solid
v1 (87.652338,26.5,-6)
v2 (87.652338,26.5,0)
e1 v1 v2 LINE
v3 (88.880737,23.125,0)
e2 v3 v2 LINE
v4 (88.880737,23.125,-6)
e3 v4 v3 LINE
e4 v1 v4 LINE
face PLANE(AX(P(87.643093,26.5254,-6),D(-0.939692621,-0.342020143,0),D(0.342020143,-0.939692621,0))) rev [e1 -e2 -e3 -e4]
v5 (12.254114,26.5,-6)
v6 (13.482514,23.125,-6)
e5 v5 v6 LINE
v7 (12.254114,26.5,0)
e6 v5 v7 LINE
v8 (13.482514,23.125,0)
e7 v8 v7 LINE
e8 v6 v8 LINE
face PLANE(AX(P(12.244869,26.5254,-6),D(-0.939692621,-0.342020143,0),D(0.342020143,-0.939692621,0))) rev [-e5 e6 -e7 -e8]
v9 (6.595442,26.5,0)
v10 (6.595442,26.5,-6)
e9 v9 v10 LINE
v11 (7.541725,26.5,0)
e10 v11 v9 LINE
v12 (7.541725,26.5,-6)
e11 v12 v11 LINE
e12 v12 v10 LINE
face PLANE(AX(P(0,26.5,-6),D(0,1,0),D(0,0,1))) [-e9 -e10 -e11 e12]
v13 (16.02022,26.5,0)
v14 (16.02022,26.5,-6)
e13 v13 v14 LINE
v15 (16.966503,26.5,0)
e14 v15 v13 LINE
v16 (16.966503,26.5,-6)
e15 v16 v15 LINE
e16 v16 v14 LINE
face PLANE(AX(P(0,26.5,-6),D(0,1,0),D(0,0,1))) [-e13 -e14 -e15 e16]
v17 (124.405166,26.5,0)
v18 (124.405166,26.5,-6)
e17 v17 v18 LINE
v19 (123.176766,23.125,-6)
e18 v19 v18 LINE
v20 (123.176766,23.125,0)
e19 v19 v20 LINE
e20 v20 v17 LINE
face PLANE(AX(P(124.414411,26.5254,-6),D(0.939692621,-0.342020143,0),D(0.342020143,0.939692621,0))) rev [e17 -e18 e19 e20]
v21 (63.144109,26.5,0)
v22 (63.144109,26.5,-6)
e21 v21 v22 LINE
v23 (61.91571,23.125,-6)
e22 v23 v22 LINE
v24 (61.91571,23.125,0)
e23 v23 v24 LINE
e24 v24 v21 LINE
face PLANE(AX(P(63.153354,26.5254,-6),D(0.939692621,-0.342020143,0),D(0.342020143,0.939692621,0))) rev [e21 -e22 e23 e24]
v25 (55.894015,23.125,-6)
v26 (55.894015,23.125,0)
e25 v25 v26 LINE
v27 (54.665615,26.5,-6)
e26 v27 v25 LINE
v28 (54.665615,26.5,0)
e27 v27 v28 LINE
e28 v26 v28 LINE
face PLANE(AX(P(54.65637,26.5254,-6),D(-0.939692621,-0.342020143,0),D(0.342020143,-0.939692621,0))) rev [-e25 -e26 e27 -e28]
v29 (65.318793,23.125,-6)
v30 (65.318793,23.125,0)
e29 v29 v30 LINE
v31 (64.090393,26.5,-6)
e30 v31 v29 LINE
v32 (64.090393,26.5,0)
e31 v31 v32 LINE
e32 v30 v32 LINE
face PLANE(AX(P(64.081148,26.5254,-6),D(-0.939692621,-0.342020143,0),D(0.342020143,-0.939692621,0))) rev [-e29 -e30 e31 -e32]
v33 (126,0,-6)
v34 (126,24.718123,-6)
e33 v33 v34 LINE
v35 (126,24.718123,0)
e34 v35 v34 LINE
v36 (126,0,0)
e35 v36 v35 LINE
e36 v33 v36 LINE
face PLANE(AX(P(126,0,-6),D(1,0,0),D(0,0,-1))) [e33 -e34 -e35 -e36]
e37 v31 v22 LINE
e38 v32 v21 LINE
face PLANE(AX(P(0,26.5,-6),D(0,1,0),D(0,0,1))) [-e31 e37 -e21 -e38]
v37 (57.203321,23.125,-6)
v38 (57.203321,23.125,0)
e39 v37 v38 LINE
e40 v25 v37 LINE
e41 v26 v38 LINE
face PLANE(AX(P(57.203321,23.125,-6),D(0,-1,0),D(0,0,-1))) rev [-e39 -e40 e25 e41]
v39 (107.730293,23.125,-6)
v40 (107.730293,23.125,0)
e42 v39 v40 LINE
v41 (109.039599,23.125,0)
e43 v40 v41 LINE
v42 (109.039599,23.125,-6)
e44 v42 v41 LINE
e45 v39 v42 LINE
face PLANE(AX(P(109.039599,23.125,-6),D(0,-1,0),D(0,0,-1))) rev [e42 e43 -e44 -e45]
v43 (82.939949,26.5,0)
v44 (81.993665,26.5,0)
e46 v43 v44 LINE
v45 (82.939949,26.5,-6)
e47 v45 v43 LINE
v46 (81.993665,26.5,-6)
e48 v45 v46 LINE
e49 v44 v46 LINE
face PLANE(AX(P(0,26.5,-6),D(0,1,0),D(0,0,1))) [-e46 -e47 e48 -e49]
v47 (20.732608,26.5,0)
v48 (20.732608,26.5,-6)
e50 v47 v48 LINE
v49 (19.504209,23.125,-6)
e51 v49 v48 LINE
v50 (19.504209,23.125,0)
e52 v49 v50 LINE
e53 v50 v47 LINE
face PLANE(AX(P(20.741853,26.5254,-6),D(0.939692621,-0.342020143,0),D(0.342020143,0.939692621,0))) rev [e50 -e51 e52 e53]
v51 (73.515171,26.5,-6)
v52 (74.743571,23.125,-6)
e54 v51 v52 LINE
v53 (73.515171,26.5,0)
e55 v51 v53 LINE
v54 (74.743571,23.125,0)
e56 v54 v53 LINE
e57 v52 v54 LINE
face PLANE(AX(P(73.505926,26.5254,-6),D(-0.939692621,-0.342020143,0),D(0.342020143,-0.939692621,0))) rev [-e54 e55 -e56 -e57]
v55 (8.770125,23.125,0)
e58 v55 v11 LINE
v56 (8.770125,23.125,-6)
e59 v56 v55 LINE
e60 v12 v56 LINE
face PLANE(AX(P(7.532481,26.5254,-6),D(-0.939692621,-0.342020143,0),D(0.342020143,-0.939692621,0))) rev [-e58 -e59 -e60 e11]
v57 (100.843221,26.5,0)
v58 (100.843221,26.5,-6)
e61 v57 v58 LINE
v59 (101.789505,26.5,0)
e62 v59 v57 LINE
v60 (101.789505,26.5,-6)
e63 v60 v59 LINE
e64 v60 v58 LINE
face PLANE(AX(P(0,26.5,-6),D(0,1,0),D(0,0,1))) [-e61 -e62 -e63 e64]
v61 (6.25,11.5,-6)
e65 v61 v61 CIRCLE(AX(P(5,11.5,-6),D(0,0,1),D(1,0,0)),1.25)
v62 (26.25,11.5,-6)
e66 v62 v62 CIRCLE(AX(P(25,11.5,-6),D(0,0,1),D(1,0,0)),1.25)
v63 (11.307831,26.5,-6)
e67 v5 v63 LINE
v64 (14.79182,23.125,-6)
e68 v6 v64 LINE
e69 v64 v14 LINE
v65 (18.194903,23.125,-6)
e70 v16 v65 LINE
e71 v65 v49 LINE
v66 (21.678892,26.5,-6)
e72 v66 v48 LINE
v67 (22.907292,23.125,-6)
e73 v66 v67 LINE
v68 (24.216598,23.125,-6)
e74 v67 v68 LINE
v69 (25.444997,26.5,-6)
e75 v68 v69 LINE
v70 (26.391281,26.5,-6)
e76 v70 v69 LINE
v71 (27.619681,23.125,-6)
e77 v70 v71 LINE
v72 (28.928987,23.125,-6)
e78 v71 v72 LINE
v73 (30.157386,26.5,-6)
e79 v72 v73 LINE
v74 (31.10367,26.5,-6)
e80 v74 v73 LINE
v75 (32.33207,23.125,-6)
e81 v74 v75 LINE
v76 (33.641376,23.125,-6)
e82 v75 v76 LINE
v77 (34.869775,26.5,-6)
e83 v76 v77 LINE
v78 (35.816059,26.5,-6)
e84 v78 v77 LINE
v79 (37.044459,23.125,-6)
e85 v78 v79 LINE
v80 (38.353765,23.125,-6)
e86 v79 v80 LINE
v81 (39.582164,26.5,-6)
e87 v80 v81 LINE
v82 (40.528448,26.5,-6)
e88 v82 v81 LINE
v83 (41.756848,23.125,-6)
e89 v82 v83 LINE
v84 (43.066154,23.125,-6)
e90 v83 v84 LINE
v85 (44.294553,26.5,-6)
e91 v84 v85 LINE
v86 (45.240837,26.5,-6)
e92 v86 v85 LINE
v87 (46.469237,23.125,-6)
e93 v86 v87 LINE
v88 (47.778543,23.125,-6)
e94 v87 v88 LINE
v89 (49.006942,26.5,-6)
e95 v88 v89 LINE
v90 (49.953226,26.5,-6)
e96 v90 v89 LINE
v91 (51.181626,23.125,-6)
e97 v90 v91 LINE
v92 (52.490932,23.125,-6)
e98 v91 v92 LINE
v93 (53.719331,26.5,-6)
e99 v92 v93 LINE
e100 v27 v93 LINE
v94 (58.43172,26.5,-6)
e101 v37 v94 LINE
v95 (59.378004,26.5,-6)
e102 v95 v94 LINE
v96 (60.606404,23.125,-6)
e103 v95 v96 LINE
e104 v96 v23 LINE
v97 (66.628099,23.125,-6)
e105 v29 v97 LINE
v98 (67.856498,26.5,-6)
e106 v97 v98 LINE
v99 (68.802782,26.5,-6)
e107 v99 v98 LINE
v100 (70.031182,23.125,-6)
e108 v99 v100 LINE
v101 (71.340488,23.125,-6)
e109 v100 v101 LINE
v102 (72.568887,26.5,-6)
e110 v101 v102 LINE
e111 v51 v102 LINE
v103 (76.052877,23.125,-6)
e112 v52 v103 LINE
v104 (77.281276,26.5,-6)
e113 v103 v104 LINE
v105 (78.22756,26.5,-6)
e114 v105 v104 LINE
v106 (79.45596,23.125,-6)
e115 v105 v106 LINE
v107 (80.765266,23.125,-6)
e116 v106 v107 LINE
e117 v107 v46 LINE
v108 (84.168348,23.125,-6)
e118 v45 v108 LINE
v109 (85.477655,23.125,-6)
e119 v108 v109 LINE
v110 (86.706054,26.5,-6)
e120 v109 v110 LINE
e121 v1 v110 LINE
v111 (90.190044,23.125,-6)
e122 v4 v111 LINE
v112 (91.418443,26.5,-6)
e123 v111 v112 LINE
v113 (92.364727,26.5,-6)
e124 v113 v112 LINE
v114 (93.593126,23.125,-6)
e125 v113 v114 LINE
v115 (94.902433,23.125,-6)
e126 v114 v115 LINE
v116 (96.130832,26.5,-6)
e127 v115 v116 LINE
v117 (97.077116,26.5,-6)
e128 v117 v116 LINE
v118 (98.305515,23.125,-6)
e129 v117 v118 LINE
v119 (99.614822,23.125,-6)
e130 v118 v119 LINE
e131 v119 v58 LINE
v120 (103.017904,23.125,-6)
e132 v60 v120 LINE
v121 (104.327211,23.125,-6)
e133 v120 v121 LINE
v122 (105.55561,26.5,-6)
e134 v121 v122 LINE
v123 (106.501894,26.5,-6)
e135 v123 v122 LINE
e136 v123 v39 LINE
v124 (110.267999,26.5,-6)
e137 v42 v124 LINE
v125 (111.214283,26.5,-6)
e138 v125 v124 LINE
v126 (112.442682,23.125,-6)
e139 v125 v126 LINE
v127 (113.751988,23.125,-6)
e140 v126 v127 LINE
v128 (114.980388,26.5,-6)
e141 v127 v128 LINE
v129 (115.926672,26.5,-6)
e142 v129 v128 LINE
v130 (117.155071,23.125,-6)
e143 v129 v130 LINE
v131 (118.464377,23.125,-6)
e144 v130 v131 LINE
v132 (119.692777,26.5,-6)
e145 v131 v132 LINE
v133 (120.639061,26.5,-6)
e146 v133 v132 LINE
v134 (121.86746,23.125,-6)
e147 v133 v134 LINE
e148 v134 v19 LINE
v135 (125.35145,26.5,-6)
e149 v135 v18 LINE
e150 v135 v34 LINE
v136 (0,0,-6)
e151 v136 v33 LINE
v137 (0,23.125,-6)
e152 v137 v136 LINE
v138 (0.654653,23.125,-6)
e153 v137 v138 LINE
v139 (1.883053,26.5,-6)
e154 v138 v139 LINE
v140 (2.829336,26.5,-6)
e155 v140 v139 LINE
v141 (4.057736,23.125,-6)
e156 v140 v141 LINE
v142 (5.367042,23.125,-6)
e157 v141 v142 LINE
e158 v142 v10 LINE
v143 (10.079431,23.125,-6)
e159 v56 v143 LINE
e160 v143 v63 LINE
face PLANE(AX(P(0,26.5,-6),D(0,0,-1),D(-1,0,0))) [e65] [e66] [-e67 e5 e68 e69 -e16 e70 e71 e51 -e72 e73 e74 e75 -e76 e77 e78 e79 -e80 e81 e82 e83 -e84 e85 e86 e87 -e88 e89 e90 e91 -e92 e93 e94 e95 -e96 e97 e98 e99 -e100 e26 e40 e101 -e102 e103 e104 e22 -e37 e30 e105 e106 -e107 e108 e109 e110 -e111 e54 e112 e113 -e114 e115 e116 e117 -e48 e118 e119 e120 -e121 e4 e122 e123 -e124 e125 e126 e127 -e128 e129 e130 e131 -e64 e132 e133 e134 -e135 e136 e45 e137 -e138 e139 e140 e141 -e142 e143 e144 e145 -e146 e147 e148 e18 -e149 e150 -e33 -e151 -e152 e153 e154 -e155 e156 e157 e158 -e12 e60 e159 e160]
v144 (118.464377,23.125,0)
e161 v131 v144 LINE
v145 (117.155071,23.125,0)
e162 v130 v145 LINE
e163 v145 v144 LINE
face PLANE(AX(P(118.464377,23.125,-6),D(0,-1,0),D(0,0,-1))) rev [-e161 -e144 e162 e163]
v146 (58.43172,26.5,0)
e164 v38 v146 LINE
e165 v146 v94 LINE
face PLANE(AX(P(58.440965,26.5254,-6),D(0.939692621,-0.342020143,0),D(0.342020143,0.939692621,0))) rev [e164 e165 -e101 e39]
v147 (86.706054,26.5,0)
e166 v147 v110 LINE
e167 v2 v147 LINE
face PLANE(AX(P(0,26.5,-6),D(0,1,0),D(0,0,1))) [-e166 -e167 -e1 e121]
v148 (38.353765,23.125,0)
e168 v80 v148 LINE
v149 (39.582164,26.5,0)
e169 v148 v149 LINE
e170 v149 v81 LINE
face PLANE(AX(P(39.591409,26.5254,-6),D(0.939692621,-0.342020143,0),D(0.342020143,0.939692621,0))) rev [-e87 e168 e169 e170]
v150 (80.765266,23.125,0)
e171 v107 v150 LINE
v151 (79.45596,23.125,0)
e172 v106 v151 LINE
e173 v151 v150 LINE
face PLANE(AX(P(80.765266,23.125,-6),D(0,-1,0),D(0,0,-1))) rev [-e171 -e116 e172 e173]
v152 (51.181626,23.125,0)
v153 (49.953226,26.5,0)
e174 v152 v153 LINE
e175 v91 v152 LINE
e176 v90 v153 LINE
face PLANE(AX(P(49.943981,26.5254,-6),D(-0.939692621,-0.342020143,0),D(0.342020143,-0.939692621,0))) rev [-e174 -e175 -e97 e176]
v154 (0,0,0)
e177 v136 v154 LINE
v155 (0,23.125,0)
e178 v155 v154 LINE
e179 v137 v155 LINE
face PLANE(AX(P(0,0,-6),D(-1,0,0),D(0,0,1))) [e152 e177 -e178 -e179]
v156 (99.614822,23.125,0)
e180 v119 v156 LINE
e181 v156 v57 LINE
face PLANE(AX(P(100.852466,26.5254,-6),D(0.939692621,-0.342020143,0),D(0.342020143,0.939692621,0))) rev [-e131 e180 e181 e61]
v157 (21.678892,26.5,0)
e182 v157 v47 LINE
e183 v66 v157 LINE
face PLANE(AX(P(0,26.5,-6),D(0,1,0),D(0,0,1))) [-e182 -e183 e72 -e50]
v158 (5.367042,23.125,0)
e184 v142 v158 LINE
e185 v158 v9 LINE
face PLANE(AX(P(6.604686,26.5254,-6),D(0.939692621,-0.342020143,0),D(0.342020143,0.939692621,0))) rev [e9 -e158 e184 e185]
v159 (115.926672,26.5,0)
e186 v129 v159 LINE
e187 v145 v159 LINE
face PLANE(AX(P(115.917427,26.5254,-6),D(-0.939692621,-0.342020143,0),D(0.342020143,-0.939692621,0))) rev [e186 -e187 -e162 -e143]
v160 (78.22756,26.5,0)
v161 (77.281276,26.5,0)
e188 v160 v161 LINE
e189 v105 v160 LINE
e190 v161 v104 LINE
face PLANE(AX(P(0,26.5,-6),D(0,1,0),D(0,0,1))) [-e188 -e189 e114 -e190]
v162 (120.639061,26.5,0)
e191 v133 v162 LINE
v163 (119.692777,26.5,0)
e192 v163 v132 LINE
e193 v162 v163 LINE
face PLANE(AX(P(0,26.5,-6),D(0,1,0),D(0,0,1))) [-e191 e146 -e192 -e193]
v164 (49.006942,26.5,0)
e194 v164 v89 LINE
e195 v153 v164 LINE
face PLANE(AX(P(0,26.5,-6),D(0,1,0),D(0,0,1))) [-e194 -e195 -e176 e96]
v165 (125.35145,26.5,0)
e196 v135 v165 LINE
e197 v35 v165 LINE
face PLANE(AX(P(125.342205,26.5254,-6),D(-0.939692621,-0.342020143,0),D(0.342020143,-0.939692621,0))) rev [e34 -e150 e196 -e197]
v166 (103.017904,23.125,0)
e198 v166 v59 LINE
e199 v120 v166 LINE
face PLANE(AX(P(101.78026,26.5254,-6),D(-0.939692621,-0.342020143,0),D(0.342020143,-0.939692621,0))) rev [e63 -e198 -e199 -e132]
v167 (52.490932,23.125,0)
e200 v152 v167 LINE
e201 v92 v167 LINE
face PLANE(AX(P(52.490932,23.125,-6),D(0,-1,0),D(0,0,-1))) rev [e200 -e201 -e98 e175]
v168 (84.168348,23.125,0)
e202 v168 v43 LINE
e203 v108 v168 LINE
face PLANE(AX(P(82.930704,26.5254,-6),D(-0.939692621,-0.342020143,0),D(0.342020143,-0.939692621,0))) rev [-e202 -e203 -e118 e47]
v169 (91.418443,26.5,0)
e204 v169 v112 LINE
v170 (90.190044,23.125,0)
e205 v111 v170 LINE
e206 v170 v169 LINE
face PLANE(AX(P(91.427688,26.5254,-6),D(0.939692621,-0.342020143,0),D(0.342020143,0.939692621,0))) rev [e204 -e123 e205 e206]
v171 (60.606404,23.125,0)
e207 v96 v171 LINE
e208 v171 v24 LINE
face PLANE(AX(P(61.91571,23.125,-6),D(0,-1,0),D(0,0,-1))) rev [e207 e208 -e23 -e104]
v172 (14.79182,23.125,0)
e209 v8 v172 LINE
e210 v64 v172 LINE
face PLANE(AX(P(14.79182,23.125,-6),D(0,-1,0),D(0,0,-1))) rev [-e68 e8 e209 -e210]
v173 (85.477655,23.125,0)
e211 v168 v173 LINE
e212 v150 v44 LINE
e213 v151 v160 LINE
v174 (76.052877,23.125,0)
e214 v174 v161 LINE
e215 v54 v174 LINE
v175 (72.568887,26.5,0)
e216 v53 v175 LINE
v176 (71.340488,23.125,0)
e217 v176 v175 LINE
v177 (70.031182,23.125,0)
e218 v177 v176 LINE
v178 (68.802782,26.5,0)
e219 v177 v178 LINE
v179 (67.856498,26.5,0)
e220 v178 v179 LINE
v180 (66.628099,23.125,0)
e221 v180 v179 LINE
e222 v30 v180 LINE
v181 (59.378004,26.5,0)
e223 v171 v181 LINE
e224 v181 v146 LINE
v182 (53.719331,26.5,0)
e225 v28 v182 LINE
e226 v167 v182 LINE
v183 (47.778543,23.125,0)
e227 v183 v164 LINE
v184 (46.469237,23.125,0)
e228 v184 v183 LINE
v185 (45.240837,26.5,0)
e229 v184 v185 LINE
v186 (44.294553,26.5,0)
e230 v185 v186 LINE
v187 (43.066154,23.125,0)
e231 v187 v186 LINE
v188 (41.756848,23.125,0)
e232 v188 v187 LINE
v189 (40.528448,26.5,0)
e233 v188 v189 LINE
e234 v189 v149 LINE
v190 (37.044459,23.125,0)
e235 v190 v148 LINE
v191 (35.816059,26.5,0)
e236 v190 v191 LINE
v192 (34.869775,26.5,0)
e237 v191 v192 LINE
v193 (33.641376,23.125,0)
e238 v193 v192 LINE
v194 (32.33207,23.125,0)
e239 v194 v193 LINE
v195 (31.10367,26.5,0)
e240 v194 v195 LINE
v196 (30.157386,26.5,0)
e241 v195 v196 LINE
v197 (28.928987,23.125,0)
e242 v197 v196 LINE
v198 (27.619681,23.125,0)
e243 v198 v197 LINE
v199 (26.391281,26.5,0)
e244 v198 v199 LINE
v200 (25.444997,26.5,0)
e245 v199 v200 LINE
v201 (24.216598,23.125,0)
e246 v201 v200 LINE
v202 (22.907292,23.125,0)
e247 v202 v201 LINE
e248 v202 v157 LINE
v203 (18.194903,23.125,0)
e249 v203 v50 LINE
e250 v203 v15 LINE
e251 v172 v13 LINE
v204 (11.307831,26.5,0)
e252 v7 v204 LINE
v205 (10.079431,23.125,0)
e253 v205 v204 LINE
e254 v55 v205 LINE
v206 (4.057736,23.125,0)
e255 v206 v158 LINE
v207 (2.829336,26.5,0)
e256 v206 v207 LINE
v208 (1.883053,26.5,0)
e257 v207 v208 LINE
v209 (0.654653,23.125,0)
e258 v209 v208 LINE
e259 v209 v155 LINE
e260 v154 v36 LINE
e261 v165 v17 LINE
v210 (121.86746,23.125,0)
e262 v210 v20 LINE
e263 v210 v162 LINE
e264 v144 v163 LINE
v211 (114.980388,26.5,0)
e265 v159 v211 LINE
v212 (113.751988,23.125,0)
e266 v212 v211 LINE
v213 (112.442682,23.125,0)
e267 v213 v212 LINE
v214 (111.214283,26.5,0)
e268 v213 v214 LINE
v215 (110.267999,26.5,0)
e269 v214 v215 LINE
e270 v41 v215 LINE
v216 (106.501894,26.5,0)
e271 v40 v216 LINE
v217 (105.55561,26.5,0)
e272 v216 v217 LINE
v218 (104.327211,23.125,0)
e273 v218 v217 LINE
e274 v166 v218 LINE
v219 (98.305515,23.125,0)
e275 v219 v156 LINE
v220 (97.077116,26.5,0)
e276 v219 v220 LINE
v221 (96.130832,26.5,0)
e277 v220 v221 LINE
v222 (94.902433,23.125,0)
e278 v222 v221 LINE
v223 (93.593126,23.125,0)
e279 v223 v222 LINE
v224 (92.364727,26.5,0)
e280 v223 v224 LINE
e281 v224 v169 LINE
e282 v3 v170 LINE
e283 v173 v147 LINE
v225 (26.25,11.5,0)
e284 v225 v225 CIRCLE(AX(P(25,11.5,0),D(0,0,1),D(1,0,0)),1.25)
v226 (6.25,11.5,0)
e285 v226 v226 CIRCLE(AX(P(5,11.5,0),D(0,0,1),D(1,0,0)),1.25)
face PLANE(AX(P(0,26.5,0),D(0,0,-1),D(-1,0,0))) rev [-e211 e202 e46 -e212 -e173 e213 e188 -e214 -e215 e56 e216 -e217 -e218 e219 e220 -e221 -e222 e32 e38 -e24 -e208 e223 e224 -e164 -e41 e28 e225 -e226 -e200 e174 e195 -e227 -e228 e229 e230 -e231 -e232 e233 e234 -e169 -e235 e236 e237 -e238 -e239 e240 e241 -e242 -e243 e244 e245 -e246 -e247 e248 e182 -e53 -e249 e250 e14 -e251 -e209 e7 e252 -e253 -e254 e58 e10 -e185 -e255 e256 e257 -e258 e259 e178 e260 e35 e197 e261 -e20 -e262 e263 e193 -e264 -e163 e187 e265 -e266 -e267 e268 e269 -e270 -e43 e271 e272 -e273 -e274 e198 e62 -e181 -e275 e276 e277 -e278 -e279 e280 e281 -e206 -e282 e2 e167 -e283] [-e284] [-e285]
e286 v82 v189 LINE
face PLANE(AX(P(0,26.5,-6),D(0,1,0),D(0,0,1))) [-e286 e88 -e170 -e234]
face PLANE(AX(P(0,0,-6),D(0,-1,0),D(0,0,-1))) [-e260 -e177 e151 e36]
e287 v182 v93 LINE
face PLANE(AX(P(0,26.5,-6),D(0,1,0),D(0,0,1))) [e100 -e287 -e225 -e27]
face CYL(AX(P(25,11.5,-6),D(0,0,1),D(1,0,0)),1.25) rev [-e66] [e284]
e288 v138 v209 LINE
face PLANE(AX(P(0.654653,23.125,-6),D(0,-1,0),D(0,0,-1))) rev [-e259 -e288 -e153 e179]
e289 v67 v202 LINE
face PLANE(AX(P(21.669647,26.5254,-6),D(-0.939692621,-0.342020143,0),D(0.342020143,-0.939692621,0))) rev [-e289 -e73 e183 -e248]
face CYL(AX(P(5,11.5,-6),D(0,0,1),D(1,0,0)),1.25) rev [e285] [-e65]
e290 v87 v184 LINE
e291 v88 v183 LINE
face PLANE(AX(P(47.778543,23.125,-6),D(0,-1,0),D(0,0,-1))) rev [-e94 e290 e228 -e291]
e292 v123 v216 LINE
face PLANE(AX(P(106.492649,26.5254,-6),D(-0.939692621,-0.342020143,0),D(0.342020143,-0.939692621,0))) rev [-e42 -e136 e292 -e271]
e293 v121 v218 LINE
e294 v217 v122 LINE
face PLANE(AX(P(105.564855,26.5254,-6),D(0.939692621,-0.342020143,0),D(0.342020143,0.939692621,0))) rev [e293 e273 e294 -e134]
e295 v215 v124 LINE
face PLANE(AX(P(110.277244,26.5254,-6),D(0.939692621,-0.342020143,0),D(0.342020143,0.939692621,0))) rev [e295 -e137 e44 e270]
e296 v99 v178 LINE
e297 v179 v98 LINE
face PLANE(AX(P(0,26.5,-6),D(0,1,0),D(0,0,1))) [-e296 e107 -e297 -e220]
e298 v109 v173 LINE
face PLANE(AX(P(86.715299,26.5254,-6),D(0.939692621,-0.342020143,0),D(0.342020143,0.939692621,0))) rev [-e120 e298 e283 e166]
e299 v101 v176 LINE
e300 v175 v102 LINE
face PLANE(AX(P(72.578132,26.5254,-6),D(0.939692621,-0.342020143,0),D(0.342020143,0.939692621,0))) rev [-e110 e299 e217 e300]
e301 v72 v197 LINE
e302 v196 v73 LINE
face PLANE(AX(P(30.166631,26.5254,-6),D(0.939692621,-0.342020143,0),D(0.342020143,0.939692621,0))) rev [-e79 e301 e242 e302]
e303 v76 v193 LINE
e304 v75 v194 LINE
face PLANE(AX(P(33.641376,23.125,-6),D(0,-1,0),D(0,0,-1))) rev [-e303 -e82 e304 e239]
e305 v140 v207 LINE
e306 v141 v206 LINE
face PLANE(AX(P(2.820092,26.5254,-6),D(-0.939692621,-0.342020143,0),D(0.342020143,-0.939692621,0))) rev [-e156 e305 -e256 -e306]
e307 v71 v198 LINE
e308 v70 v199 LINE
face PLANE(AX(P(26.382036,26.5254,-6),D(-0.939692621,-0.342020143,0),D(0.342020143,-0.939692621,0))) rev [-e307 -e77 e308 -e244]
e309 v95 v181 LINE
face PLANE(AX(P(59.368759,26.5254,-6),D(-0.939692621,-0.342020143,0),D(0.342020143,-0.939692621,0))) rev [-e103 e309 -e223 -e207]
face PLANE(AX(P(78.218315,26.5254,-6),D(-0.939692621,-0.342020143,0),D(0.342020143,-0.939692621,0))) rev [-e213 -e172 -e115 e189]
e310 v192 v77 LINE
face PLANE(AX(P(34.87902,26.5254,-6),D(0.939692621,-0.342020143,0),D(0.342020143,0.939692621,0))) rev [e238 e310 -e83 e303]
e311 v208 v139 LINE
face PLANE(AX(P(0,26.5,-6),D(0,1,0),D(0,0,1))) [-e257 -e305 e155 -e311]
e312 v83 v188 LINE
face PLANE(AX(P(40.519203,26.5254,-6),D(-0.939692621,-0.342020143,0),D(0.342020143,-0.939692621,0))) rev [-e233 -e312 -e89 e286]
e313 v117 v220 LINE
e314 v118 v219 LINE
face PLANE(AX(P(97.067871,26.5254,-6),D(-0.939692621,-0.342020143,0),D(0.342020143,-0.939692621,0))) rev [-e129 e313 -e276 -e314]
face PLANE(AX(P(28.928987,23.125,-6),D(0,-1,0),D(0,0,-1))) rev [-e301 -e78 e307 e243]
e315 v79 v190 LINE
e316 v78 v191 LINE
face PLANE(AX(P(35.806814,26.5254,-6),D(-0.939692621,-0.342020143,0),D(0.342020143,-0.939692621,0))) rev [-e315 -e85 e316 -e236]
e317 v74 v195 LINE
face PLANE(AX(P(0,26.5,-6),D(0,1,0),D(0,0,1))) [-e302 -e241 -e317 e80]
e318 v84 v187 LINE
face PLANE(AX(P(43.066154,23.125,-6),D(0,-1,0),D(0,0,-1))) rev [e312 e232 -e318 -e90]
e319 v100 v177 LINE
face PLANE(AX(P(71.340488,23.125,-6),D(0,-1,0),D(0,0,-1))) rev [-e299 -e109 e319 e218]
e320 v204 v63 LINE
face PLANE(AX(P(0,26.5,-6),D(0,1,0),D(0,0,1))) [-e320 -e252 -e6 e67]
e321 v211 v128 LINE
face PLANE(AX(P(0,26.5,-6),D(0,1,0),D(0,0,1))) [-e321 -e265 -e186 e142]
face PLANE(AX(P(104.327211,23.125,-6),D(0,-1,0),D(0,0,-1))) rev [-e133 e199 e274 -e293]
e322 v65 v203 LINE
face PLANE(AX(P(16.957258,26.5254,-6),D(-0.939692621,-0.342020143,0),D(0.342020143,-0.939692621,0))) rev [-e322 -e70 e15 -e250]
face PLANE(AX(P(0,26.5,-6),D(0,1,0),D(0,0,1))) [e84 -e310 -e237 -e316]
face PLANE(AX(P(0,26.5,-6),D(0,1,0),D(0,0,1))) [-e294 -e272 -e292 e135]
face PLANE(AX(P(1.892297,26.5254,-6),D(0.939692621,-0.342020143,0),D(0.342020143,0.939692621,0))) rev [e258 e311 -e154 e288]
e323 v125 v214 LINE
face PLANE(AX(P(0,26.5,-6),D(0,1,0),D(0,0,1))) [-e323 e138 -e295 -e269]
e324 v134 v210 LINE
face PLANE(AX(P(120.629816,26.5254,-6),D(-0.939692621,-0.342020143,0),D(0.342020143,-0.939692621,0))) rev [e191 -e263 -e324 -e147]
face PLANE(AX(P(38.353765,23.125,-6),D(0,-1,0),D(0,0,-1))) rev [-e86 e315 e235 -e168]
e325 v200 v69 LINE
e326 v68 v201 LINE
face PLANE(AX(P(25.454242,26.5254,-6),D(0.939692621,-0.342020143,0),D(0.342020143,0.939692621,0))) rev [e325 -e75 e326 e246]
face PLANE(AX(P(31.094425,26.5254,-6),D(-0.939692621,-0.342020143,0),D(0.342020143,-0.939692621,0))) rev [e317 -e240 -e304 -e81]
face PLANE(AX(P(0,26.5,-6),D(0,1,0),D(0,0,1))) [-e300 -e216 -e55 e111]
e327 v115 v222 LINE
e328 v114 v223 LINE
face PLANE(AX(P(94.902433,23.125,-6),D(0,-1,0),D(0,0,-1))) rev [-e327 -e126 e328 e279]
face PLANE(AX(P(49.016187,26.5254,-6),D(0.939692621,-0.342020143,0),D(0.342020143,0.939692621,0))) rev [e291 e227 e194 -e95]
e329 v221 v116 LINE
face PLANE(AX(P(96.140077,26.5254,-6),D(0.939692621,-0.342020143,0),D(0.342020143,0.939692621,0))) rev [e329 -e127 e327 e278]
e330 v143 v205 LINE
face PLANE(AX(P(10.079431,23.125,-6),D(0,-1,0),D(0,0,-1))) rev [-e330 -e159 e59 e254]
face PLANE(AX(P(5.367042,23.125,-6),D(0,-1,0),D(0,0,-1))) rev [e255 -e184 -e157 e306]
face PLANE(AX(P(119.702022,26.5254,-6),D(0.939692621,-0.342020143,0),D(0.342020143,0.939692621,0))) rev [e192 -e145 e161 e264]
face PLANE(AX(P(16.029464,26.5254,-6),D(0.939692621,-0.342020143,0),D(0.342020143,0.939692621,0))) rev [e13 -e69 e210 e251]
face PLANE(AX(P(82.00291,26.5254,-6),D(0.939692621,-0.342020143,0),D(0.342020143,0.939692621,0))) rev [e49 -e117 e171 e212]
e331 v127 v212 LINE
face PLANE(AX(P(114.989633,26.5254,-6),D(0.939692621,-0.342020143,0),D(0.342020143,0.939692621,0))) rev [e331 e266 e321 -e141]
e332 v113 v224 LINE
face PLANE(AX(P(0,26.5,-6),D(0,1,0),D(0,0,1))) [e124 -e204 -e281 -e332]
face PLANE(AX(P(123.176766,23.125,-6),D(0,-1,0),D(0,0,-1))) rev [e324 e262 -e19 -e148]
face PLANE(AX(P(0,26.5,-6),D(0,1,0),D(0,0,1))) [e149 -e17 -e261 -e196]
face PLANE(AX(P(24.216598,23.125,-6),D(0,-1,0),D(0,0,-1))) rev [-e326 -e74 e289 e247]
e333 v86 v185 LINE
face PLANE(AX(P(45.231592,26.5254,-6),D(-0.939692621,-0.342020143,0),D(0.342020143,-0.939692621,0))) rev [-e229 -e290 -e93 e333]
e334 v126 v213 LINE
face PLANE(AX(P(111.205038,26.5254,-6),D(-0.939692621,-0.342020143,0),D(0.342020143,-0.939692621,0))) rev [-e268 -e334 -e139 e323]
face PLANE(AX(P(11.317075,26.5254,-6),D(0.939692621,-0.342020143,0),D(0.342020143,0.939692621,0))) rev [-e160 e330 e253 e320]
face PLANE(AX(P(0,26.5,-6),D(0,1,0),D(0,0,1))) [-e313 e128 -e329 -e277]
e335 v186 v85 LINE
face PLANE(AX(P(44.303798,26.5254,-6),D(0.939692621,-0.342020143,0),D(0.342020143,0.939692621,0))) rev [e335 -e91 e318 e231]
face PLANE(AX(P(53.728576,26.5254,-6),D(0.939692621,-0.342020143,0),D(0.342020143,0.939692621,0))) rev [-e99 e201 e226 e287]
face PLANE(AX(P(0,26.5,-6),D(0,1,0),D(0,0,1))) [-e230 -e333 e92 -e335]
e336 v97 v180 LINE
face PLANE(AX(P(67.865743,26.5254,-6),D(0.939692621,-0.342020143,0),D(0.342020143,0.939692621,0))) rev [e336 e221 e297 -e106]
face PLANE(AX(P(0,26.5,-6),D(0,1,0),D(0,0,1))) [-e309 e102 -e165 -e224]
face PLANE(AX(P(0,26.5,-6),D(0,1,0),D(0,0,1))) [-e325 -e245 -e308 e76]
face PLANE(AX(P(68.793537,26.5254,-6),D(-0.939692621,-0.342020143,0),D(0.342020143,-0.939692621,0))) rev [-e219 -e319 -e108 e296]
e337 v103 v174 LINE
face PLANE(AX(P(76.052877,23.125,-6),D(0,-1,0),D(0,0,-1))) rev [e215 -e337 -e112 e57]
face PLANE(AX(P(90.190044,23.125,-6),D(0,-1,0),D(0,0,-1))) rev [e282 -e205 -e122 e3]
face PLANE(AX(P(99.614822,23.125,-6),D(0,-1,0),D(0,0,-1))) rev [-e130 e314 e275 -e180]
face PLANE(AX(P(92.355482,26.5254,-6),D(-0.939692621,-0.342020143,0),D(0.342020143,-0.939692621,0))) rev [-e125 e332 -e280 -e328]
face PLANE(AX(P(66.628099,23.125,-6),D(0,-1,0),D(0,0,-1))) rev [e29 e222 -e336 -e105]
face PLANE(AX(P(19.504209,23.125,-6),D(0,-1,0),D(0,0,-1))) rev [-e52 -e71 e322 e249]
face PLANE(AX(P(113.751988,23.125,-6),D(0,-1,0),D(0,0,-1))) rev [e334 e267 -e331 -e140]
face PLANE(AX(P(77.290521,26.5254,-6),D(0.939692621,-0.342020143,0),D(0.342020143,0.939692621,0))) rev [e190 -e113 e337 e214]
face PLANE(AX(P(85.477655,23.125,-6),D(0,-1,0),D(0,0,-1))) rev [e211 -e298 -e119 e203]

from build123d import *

# Parameters (mm, degrees)
BLANKSKE_W              = 126
BLANKSKE_H              = 26.5
BLANK_DEPTH             = 6
TOOTHCUTSIM_DEPTH       = 129.896276129
TEETHCUTS_COUNT         = 33
TEETHCUTS_PITCH         = 4.712388975
ESQUISSE1_R             = 1.25
ENL_V_MAT_EXTRU_1_DEPTH = 6


with BuildPart() as part:
    # BlankSke → Blank (new body)
    with BuildSketch(Plane.XY):
        with Locations((63, 13.25)):
            Rectangle(BLANKSKE_W, BLANKSKE_H)
    extrude(amount=-BLANK_DEPTH)

    # TooCutSkeSim → ToothCutSim (cut, through all)
    with BuildSketch(Plane.XY):
        Polygon((0.654653055, 23.125), (-0.654653055, 23.125), (-1.892297439, 26.5254), (1.892297439, 26.5254), align=None)
    toothcutsim = extrude(amount=-TOOTHCUTSIM_DEPTH, mode=Mode.SUBTRACT)

    # TeethCuts: ToothCutSim ×33
    with Locations(*[(i * TEETHCUTS_PITCH, 0, 0) for i in range(1, TEETHCUTS_COUNT)]):
        add(toothcutsim, mode=Mode.SUBTRACT)

    # Esquisse1 → Enlèv. mat.-Extru.1 (cut)
    with BuildSketch(Plane.XY):
        with Locations((5, 11.5)):
            Circle(ESQUISSE1_R)
        with Locations((25, 11.5)):
            Circle(ESQUISSE1_R)
    extrude(amount=-ENL_V_MAT_EXTRU_1_DEPTH, mode=Mode.SUBTRACT)


solid = part.part
